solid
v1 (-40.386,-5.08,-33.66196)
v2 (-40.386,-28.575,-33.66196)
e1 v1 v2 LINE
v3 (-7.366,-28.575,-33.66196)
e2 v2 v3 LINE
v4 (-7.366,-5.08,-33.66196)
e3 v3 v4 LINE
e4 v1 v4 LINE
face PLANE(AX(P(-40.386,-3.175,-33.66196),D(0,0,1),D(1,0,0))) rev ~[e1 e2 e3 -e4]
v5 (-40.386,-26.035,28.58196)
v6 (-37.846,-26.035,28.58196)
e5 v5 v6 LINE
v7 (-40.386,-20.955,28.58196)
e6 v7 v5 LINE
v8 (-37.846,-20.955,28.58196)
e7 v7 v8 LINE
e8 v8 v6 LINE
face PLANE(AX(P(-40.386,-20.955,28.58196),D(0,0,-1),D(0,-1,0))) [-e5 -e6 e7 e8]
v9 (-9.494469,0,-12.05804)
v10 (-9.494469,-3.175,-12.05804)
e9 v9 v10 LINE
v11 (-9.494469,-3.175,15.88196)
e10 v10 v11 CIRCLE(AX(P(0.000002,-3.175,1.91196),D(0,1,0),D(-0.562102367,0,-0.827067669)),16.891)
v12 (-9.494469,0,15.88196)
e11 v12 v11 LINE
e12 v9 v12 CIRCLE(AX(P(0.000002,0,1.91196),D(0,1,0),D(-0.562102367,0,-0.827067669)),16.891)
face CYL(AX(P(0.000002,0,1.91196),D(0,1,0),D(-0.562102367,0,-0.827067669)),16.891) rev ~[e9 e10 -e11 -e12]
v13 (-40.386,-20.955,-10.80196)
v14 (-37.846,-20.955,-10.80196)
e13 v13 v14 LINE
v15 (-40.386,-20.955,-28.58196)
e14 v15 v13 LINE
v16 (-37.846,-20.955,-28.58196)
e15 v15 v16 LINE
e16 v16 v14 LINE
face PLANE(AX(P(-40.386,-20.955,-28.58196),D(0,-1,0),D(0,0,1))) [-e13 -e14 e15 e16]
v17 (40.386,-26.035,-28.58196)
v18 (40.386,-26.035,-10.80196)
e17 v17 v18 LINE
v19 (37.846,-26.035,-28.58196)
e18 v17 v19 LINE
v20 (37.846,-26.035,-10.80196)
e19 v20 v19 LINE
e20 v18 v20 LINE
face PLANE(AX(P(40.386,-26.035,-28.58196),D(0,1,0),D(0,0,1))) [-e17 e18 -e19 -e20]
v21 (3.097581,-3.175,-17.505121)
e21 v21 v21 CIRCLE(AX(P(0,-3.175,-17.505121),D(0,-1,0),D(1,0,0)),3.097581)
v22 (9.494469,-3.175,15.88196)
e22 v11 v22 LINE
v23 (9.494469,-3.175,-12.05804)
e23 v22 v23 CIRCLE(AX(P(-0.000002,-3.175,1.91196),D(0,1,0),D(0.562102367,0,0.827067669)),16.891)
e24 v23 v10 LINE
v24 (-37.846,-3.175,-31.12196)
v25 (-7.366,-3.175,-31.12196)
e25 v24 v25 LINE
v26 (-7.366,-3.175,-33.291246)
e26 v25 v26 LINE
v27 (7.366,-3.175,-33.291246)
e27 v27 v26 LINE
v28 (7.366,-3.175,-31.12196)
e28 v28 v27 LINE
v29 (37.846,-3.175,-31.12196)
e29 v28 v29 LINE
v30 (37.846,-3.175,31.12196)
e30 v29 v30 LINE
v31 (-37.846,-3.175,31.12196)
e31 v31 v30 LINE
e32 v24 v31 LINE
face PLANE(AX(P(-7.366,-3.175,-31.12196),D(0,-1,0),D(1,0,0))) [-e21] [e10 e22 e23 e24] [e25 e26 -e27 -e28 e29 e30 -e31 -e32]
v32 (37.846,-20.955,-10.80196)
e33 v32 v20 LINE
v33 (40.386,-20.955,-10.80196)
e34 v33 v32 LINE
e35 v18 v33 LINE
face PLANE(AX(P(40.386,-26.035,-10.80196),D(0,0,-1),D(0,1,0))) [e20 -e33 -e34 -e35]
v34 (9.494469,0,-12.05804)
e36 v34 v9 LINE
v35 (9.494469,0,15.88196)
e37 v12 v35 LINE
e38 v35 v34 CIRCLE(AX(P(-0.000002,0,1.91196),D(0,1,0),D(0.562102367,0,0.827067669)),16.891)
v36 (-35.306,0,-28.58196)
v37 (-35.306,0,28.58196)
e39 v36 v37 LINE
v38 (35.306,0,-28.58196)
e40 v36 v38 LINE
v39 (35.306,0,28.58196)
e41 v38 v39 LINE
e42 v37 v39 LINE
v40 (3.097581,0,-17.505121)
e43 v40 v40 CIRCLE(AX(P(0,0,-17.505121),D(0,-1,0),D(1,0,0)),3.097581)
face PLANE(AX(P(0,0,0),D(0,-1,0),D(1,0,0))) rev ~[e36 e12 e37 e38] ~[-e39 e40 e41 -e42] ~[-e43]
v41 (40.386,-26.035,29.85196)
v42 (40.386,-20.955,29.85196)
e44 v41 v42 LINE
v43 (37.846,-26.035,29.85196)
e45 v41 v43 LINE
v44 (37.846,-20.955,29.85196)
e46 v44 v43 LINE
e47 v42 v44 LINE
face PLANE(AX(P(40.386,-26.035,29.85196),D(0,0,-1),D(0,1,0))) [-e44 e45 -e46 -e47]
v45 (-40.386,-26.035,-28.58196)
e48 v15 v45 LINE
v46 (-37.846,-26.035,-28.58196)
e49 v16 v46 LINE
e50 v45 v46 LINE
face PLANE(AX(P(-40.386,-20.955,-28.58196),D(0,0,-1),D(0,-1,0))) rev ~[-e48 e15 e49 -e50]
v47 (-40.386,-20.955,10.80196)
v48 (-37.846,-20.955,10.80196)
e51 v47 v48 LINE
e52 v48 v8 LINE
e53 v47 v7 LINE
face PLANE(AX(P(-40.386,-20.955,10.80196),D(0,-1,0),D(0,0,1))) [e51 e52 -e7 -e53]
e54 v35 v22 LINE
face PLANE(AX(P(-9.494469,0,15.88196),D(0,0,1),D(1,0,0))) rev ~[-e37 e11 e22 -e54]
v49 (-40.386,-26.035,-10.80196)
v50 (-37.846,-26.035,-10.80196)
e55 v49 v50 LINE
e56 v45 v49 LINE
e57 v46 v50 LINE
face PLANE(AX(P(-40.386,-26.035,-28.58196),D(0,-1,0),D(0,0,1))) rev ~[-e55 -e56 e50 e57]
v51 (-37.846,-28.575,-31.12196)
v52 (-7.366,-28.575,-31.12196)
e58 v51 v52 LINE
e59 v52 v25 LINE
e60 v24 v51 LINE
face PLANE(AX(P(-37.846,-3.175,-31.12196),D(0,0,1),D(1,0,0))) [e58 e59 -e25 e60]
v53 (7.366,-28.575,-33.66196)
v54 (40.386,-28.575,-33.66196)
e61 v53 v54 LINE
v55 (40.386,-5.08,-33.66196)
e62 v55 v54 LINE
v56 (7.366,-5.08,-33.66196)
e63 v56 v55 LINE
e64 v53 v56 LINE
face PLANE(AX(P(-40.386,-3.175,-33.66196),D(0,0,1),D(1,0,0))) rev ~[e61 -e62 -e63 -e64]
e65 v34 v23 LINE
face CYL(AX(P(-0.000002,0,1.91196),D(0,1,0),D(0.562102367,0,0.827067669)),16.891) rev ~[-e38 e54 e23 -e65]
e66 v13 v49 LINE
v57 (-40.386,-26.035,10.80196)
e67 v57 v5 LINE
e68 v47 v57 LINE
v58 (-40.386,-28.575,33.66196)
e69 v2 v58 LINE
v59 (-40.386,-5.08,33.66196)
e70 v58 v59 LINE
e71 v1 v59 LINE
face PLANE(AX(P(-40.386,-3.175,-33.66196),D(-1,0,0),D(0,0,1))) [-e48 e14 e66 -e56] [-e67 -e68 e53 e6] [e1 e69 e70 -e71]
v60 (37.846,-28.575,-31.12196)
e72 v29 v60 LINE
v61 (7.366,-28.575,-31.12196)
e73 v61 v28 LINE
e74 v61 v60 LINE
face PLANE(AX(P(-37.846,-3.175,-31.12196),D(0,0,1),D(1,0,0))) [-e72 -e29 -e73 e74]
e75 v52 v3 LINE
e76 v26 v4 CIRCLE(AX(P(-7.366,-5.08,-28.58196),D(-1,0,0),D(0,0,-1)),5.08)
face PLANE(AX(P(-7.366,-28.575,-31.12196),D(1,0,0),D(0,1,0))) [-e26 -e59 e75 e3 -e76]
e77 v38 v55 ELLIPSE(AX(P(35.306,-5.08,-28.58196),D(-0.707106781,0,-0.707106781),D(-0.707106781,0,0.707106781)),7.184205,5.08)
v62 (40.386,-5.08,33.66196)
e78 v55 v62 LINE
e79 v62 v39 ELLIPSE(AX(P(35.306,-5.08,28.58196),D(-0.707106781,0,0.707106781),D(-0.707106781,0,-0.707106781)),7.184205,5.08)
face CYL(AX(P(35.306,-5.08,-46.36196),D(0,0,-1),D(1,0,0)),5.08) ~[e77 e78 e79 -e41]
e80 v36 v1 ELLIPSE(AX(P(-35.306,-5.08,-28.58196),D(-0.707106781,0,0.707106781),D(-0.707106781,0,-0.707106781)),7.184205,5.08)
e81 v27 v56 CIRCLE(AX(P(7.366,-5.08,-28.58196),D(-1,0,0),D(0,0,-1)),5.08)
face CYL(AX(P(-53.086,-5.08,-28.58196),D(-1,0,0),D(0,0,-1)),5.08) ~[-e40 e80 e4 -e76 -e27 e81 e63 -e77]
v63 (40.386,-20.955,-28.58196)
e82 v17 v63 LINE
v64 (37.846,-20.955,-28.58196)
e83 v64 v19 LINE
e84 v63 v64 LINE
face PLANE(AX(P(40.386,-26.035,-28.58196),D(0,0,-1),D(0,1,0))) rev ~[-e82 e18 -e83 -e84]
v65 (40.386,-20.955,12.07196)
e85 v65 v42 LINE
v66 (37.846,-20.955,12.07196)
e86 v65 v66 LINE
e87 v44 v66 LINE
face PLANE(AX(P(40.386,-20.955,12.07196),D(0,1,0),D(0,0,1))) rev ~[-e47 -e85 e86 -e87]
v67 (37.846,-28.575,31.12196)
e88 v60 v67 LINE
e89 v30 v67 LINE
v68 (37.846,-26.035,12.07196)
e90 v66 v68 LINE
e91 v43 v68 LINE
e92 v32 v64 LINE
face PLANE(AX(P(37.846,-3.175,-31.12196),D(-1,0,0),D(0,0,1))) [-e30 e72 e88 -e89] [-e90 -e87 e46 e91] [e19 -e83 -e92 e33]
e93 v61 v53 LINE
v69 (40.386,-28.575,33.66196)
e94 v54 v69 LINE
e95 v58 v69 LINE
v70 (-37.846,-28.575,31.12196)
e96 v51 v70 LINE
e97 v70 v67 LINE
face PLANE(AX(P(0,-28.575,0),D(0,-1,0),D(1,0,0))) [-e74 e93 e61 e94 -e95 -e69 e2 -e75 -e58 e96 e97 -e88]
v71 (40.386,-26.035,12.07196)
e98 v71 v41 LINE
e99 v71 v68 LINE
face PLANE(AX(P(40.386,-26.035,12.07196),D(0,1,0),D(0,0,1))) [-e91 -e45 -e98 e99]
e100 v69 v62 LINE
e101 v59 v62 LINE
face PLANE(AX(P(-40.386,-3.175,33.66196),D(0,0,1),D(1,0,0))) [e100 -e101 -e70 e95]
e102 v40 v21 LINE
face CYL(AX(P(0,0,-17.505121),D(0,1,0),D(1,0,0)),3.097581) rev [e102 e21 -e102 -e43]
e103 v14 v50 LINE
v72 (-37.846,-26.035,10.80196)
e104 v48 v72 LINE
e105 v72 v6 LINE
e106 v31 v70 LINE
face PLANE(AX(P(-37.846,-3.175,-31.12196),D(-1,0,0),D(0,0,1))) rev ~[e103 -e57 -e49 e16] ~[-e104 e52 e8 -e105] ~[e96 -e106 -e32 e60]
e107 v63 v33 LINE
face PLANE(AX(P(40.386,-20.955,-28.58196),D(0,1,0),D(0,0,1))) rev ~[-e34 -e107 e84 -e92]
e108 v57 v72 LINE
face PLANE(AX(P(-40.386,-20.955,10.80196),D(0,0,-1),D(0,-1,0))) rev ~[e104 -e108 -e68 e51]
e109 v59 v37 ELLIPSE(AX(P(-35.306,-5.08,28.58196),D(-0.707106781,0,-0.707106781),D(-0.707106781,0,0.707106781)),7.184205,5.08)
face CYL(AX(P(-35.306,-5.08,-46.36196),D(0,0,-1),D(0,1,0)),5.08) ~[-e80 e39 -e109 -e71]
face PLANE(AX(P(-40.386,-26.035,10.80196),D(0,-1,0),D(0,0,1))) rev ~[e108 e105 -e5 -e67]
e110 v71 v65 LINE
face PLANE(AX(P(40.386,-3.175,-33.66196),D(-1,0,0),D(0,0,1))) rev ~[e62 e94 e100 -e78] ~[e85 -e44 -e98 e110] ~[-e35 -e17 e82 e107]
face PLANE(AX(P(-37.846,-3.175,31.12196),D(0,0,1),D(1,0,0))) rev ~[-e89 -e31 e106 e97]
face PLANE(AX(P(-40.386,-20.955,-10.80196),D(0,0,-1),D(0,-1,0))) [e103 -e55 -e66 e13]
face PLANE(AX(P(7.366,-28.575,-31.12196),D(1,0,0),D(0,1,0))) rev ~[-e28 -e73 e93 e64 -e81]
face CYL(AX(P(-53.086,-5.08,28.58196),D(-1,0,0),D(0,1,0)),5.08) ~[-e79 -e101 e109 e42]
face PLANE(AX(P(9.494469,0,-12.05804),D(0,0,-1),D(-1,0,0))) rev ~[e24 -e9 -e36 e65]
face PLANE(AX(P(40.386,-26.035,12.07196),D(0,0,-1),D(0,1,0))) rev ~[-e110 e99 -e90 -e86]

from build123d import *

# Parameters (mm, degrees)
F0_W         = 80.772
F0_H         = 67.3239192
F0_R         = 3.0975808
F1_DEPTH     = 3.175
F2_W         = 80.772
F2_H         = 67.3239192
F2_W_2       = 75.692
F2_H_2       = 62.2439192
F3_DEPTH     = 25.4
F4_W         = 14.732
F4_H         = 25.4
F5_DEPTH     = 25.4
F6_W         = 5.08
F6_H         = 17.78
F7_DEPTH     = 25.4
F8_W         = 5.08
F8_H         = 17.78
F9_DEPTH     = 25.4
F10_T1_DEPTH = 106.172
F10_T3_DEPTH = 92.7239192


# Not quite as in the source:
# - a fillet or chamfer that OpenCascade refuses, or shapes differently, is made with other operations: its cross-section is extruded or revolved along the edge and cut away or added


with BuildPart() as f1:
    # F0 (on Front) → F1 (new body)
    with BuildSketch(Plane.XZ):
        Rectangle(F0_W, F0_H)
        with Locations((0, -17.5051212)):
            Circle(F0_R, mode=Mode.SUBTRACT)
        with BuildLine():
            Line((9.4944692, -12.0580404), (-9.4944692, -12.0580404))
            ThreePointArc((-9.4944692, -12.0580404), (-16.8909981247, 1.9119596), (-9.4944692, 15.8819596))
            Line((-9.4944692, 15.8819596), (9.4944692, 15.8819596))
            ThreePointArc((9.4944692, 15.8819596), (16.8909981247, 1.9119596), (9.4944692, -12.0580404))
        make_face(mode=Mode.SUBTRACT)
    extrude(amount=F1_DEPTH)

    # F2 (on face) → F3 (join)
    with BuildSketch(Plane.XZ.offset(3.175)):
        Rectangle(F2_W, F2_H)
        Rectangle(F2_W_2, F2_H_2, mode=Mode.SUBTRACT)
    extrude(amount=F3_DEPTH)

    # F4 (on face) → F5 (cut)
    with BuildSketch(Plane.XY.offset(-31.1219596)):
        with Locations((0, -15.875)):
            Rectangle(F4_W, F4_H)
    extrude(amount=-F5_DEPTH, mode=Mode.SUBTRACT)

    # F6 (on face) → F7 (cut)
    with BuildSketch(Plane.YZ.offset(40.386)):
        with Locations((-23.495, 20.9619596)):
            Rectangle(F6_W, F6_H)
        with Locations((-23.495, -19.6919596)):
            Rectangle(F6_W, F6_H)
    extrude(amount=-F7_DEPTH, mode=Mode.SUBTRACT)

    # F8 (on face) → F9 (cut)
    with BuildSketch(Plane(origin=(-40.386, 0, 0), x_dir=(0, -1, 0), z_dir=(-1, 0, 0))):
        with Locations((23.495, 19.6919596)):
            Rectangle(F8_W, F8_H)
        with Locations((23.495, -19.6919596)):
            Rectangle(F8_W, F8_H)
    extrude(amount=-F9_DEPTH, mode=Mode.SUBTRACT)

    # F10: fillet of radius 5.08 on 4 edges, made by hand

    # F10_s2 → F10_t1 (cut)
    with BuildSketch(Plane.YZ.offset(-53.086)):
        with BuildLine():
            ThreePointArc((0, 28.5819596), (-1.4878975516, 32.1740620484), (-5.08, 33.6619596))
            Line((-5.08, 33.6619596), (0, 33.6619596))
            Line((0, 33.6619596), (0, 28.5819596))
        make_face()
        with BuildLine():
            ThreePointArc((-5.08, -33.6619596), (-1.4878975516, -32.1740620484), (0, -28.5819596))
            Line((0, -28.5819596), (0, -33.6619596))
            Line((0, -33.6619596), (-5.08, -33.6619596))
        make_face()
    extrude(amount=F10_T1_DEPTH, mode=Mode.SUBTRACT)

    # F10_s4 → F10_t3 (cut)
    with BuildSketch(Plane.XY.offset(-46.3619596)):
        with BuildLine():
            ThreePointArc((-35.306, 0), (-38.8981024484, -1.4878975516), (-40.386, -5.08))
            Line((-40.386, -5.08), (-40.386, 0))
            Line((-40.386, 0), (-35.306, 0))
        make_face()
        with BuildLine():
            ThreePointArc((40.386, -5.08), (38.8981024484, -1.4878975516), (35.306, 0))
            Line((35.306, 0), (40.386, 0))
            Line((40.386, 0), (40.386, -5.08))
        make_face()
    extrude(amount=F10_T3_DEPTH, mode=Mode.SUBTRACT)


solid = f1.part
